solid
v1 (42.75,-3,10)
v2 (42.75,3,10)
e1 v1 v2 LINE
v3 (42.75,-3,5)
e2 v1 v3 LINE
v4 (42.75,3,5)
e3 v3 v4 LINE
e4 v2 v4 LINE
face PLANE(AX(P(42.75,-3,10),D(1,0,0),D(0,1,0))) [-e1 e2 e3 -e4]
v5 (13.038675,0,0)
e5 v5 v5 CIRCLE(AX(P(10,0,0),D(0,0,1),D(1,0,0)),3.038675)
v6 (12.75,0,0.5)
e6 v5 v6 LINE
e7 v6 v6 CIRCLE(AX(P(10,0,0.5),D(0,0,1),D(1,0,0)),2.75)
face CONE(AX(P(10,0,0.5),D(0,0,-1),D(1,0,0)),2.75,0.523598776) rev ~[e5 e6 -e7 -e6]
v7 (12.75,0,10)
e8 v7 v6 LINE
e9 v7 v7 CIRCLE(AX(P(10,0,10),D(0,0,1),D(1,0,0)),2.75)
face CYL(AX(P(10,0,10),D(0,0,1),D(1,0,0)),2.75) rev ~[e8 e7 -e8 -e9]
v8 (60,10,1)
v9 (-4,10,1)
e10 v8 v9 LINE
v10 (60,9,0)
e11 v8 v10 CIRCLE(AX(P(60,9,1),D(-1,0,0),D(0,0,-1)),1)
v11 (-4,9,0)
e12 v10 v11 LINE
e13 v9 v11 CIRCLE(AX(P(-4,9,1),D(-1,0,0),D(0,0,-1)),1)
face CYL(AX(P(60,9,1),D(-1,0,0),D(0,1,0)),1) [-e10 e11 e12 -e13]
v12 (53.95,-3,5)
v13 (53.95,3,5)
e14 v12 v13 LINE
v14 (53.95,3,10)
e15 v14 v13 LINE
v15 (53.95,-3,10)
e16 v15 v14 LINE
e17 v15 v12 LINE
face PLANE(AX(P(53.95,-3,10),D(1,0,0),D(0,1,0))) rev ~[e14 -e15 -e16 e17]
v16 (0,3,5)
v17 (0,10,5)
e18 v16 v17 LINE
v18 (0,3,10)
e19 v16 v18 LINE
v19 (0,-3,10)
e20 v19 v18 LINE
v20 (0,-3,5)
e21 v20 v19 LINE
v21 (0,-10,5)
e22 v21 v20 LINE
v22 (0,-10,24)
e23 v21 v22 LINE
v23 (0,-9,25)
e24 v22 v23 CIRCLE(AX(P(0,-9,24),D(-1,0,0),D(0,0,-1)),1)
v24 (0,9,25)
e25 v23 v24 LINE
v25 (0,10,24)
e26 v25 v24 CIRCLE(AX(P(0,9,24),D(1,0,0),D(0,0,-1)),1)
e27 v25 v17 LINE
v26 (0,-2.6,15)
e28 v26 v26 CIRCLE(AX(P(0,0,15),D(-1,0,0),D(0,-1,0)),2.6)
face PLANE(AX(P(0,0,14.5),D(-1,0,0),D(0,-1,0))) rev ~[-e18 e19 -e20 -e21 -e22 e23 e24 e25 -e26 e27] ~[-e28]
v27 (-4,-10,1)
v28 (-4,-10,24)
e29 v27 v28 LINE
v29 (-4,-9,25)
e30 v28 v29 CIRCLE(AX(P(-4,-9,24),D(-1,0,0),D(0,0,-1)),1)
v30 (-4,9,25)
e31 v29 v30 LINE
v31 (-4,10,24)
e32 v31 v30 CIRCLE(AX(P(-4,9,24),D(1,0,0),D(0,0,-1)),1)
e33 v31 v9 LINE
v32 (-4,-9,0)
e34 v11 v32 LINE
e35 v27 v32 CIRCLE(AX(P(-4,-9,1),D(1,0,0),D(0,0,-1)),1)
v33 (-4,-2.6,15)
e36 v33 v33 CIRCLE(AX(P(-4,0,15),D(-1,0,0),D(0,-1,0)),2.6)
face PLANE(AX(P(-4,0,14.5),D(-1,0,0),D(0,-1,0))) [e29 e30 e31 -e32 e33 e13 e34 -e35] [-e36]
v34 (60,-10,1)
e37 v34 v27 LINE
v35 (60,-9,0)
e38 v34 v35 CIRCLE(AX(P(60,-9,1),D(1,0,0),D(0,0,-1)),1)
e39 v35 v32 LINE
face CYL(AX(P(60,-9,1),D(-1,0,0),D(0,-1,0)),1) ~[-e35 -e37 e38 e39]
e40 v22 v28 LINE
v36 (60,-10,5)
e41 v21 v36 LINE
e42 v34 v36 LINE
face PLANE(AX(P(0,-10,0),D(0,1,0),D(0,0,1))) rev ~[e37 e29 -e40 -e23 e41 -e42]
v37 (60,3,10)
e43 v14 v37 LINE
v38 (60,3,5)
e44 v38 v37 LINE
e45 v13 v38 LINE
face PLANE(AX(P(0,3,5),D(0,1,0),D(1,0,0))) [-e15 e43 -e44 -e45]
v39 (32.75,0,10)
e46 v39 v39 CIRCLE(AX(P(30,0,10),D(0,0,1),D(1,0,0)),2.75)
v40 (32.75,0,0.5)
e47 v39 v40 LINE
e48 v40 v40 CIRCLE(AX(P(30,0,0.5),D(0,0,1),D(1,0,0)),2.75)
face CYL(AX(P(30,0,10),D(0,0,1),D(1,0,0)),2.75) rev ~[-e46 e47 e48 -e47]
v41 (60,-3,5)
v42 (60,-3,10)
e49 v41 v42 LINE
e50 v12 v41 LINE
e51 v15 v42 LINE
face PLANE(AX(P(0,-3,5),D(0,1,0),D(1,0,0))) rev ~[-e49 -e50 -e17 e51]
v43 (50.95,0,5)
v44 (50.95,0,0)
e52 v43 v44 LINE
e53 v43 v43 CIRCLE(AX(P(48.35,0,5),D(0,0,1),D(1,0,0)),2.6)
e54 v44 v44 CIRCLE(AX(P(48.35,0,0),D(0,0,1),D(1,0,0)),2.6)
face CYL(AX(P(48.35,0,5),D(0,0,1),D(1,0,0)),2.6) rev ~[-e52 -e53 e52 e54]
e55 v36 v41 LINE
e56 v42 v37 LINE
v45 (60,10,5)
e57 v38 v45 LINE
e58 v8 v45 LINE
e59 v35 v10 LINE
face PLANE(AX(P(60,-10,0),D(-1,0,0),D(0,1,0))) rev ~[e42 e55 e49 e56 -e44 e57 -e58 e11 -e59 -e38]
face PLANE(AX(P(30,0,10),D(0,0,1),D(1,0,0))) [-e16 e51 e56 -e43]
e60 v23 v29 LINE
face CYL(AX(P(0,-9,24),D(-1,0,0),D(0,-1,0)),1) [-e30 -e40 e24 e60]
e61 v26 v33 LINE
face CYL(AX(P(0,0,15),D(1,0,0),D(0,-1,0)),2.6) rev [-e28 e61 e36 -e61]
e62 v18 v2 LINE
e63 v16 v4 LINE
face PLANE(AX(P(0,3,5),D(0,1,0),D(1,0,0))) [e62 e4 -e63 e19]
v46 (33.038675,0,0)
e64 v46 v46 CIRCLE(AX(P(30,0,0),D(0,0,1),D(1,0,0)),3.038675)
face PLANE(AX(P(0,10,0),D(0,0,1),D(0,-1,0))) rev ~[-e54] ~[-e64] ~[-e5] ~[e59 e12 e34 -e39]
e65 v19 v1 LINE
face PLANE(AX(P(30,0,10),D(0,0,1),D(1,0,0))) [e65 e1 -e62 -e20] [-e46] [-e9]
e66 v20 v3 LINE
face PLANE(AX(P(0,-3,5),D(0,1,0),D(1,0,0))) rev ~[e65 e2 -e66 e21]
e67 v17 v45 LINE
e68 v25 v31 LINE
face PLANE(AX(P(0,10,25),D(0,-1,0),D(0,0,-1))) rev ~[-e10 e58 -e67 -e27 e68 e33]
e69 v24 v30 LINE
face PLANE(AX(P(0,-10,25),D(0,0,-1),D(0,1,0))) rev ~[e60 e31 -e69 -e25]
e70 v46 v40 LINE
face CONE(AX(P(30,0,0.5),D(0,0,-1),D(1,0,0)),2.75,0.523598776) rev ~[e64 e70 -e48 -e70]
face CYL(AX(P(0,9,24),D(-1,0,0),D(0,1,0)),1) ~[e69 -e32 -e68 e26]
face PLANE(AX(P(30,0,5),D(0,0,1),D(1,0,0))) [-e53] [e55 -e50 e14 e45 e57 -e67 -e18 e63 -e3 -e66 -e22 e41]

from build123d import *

# Parameters (mm, degrees)
F0_W         = 60
F0_H         = 20
F1_DEPTH     = 5
F2_W         = 60
F2_H         = 6
F3_DEPTH     = 5
F4_R         = 2.75
F5_DEPTH     = 25
F6_W         = 11.2
F6_H         = 6
F7_DEPTH     = 5
F8_R         = 2.6
F9_DEPTH     = 5
F10_R        = 2.6
F11_DEPTH    = 4
F12_R        = 1
F13_C1_SIZE2 = 0.5
F13_C1_SIZE  = 0.2886751346
F13_C2_SIZE2 = 0.5
F13_C2_SIZE  = 0.2886751346


# Not quite as in the source:
# - a feature names something its author has since deleted; it is built from what else it names


with BuildPart() as f1:
    # F0 (on Top) → F1 (new body)
    with BuildSketch(Plane.XY):
        with Locations((30, 0)):
            Rectangle(F0_W, F0_H)
    extrude(amount=F1_DEPTH)

    # F2 (on face) → F3 (join)
    with BuildSketch(Plane.XY.offset(5)):
        with Locations((30, 0)):
            Rectangle(F2_W, F2_H)
    extrude(amount=F3_DEPTH)

    # F4 (on face) → F5 (cut)
    with BuildSketch(Plane.XY.offset(10)):
        with Locations((30, 0)):
            Circle(F4_R)
        with Locations((10, 0)):
            Circle(F4_R)
    extrude(amount=-F5_DEPTH, mode=Mode.SUBTRACT)

    # F6 (on face) → F7 (cut, through all)
    with BuildSketch(Plane.XY.offset(10)):
        with Locations((48.35, 0)):
            Rectangle(F6_W, F6_H)
    extrude(amount=-F7_DEPTH, mode=Mode.SUBTRACT)

    # F8 (on face) → F9 (cut, through all)
    with BuildSketch(Plane.XY.offset(5)):
        with Locations((48.35, 0)):
            Circle(F8_R)
    extrude(amount=-F9_DEPTH, mode=Mode.SUBTRACT)

    # F10 (on face) → F11 (join)
    with BuildSketch(Plane(origin=(0, 0, 0), x_dir=(0, -1, 0), z_dir=(-1, 0, 0))):
        Polygon((-10, 25), (-10, 5), (-3, 5), (-3, 10), (3, 10), (3, 5), (10, 5), (10, 25), align=None)
        with Locations((0, 15)):
            Circle(F10_R, mode=Mode.SUBTRACT)
        Polygon((-10, 5), (-10, 0), (10, 0), (10, 5), (3, 5), (3, 10), (-3, 10), (-3, 5), align=None)
    extrude(amount=F11_DEPTH)

    # F12
    f12_edges = [f1.edges().sort_by_distance(p)[0] for p in [
        (-2, -10, 25),
        (-2, 10, 25),
        (28, -10, 0),
        (28, 10, 0),
    ]]
    fillet(f12_edges, radius=F12_R)

    # F13: chamfer of 0.5 x 0.2886751346 on 2 edges, made by hand

    # F13_c1
    f13_c1_edges = [f1.edges().sort_by_distance(p)[0] for p in [
        (7.25, 0, 0),
    ]]
    f13_c1_side = f1.faces().sort_by_distance((7.2442264973, 0, 0))[0]
    chamfer(f13_c1_edges, length=F13_C1_SIZE, length2=F13_C1_SIZE2, reference=f13_c1_side)

    # F13_c2
    f13_c2_edges = [f1.edges().sort_by_distance(p)[0] for p in [
        (27.25, 0, 0),
    ]]
    f13_c2_side = f1.faces().sort_by_distance((27.2442264973, 0, 0))[0]
    chamfer(f13_c2_edges, length=F13_C2_SIZE, length2=F13_C2_SIZE2, reference=f13_c2_side)


solid = f1.part
